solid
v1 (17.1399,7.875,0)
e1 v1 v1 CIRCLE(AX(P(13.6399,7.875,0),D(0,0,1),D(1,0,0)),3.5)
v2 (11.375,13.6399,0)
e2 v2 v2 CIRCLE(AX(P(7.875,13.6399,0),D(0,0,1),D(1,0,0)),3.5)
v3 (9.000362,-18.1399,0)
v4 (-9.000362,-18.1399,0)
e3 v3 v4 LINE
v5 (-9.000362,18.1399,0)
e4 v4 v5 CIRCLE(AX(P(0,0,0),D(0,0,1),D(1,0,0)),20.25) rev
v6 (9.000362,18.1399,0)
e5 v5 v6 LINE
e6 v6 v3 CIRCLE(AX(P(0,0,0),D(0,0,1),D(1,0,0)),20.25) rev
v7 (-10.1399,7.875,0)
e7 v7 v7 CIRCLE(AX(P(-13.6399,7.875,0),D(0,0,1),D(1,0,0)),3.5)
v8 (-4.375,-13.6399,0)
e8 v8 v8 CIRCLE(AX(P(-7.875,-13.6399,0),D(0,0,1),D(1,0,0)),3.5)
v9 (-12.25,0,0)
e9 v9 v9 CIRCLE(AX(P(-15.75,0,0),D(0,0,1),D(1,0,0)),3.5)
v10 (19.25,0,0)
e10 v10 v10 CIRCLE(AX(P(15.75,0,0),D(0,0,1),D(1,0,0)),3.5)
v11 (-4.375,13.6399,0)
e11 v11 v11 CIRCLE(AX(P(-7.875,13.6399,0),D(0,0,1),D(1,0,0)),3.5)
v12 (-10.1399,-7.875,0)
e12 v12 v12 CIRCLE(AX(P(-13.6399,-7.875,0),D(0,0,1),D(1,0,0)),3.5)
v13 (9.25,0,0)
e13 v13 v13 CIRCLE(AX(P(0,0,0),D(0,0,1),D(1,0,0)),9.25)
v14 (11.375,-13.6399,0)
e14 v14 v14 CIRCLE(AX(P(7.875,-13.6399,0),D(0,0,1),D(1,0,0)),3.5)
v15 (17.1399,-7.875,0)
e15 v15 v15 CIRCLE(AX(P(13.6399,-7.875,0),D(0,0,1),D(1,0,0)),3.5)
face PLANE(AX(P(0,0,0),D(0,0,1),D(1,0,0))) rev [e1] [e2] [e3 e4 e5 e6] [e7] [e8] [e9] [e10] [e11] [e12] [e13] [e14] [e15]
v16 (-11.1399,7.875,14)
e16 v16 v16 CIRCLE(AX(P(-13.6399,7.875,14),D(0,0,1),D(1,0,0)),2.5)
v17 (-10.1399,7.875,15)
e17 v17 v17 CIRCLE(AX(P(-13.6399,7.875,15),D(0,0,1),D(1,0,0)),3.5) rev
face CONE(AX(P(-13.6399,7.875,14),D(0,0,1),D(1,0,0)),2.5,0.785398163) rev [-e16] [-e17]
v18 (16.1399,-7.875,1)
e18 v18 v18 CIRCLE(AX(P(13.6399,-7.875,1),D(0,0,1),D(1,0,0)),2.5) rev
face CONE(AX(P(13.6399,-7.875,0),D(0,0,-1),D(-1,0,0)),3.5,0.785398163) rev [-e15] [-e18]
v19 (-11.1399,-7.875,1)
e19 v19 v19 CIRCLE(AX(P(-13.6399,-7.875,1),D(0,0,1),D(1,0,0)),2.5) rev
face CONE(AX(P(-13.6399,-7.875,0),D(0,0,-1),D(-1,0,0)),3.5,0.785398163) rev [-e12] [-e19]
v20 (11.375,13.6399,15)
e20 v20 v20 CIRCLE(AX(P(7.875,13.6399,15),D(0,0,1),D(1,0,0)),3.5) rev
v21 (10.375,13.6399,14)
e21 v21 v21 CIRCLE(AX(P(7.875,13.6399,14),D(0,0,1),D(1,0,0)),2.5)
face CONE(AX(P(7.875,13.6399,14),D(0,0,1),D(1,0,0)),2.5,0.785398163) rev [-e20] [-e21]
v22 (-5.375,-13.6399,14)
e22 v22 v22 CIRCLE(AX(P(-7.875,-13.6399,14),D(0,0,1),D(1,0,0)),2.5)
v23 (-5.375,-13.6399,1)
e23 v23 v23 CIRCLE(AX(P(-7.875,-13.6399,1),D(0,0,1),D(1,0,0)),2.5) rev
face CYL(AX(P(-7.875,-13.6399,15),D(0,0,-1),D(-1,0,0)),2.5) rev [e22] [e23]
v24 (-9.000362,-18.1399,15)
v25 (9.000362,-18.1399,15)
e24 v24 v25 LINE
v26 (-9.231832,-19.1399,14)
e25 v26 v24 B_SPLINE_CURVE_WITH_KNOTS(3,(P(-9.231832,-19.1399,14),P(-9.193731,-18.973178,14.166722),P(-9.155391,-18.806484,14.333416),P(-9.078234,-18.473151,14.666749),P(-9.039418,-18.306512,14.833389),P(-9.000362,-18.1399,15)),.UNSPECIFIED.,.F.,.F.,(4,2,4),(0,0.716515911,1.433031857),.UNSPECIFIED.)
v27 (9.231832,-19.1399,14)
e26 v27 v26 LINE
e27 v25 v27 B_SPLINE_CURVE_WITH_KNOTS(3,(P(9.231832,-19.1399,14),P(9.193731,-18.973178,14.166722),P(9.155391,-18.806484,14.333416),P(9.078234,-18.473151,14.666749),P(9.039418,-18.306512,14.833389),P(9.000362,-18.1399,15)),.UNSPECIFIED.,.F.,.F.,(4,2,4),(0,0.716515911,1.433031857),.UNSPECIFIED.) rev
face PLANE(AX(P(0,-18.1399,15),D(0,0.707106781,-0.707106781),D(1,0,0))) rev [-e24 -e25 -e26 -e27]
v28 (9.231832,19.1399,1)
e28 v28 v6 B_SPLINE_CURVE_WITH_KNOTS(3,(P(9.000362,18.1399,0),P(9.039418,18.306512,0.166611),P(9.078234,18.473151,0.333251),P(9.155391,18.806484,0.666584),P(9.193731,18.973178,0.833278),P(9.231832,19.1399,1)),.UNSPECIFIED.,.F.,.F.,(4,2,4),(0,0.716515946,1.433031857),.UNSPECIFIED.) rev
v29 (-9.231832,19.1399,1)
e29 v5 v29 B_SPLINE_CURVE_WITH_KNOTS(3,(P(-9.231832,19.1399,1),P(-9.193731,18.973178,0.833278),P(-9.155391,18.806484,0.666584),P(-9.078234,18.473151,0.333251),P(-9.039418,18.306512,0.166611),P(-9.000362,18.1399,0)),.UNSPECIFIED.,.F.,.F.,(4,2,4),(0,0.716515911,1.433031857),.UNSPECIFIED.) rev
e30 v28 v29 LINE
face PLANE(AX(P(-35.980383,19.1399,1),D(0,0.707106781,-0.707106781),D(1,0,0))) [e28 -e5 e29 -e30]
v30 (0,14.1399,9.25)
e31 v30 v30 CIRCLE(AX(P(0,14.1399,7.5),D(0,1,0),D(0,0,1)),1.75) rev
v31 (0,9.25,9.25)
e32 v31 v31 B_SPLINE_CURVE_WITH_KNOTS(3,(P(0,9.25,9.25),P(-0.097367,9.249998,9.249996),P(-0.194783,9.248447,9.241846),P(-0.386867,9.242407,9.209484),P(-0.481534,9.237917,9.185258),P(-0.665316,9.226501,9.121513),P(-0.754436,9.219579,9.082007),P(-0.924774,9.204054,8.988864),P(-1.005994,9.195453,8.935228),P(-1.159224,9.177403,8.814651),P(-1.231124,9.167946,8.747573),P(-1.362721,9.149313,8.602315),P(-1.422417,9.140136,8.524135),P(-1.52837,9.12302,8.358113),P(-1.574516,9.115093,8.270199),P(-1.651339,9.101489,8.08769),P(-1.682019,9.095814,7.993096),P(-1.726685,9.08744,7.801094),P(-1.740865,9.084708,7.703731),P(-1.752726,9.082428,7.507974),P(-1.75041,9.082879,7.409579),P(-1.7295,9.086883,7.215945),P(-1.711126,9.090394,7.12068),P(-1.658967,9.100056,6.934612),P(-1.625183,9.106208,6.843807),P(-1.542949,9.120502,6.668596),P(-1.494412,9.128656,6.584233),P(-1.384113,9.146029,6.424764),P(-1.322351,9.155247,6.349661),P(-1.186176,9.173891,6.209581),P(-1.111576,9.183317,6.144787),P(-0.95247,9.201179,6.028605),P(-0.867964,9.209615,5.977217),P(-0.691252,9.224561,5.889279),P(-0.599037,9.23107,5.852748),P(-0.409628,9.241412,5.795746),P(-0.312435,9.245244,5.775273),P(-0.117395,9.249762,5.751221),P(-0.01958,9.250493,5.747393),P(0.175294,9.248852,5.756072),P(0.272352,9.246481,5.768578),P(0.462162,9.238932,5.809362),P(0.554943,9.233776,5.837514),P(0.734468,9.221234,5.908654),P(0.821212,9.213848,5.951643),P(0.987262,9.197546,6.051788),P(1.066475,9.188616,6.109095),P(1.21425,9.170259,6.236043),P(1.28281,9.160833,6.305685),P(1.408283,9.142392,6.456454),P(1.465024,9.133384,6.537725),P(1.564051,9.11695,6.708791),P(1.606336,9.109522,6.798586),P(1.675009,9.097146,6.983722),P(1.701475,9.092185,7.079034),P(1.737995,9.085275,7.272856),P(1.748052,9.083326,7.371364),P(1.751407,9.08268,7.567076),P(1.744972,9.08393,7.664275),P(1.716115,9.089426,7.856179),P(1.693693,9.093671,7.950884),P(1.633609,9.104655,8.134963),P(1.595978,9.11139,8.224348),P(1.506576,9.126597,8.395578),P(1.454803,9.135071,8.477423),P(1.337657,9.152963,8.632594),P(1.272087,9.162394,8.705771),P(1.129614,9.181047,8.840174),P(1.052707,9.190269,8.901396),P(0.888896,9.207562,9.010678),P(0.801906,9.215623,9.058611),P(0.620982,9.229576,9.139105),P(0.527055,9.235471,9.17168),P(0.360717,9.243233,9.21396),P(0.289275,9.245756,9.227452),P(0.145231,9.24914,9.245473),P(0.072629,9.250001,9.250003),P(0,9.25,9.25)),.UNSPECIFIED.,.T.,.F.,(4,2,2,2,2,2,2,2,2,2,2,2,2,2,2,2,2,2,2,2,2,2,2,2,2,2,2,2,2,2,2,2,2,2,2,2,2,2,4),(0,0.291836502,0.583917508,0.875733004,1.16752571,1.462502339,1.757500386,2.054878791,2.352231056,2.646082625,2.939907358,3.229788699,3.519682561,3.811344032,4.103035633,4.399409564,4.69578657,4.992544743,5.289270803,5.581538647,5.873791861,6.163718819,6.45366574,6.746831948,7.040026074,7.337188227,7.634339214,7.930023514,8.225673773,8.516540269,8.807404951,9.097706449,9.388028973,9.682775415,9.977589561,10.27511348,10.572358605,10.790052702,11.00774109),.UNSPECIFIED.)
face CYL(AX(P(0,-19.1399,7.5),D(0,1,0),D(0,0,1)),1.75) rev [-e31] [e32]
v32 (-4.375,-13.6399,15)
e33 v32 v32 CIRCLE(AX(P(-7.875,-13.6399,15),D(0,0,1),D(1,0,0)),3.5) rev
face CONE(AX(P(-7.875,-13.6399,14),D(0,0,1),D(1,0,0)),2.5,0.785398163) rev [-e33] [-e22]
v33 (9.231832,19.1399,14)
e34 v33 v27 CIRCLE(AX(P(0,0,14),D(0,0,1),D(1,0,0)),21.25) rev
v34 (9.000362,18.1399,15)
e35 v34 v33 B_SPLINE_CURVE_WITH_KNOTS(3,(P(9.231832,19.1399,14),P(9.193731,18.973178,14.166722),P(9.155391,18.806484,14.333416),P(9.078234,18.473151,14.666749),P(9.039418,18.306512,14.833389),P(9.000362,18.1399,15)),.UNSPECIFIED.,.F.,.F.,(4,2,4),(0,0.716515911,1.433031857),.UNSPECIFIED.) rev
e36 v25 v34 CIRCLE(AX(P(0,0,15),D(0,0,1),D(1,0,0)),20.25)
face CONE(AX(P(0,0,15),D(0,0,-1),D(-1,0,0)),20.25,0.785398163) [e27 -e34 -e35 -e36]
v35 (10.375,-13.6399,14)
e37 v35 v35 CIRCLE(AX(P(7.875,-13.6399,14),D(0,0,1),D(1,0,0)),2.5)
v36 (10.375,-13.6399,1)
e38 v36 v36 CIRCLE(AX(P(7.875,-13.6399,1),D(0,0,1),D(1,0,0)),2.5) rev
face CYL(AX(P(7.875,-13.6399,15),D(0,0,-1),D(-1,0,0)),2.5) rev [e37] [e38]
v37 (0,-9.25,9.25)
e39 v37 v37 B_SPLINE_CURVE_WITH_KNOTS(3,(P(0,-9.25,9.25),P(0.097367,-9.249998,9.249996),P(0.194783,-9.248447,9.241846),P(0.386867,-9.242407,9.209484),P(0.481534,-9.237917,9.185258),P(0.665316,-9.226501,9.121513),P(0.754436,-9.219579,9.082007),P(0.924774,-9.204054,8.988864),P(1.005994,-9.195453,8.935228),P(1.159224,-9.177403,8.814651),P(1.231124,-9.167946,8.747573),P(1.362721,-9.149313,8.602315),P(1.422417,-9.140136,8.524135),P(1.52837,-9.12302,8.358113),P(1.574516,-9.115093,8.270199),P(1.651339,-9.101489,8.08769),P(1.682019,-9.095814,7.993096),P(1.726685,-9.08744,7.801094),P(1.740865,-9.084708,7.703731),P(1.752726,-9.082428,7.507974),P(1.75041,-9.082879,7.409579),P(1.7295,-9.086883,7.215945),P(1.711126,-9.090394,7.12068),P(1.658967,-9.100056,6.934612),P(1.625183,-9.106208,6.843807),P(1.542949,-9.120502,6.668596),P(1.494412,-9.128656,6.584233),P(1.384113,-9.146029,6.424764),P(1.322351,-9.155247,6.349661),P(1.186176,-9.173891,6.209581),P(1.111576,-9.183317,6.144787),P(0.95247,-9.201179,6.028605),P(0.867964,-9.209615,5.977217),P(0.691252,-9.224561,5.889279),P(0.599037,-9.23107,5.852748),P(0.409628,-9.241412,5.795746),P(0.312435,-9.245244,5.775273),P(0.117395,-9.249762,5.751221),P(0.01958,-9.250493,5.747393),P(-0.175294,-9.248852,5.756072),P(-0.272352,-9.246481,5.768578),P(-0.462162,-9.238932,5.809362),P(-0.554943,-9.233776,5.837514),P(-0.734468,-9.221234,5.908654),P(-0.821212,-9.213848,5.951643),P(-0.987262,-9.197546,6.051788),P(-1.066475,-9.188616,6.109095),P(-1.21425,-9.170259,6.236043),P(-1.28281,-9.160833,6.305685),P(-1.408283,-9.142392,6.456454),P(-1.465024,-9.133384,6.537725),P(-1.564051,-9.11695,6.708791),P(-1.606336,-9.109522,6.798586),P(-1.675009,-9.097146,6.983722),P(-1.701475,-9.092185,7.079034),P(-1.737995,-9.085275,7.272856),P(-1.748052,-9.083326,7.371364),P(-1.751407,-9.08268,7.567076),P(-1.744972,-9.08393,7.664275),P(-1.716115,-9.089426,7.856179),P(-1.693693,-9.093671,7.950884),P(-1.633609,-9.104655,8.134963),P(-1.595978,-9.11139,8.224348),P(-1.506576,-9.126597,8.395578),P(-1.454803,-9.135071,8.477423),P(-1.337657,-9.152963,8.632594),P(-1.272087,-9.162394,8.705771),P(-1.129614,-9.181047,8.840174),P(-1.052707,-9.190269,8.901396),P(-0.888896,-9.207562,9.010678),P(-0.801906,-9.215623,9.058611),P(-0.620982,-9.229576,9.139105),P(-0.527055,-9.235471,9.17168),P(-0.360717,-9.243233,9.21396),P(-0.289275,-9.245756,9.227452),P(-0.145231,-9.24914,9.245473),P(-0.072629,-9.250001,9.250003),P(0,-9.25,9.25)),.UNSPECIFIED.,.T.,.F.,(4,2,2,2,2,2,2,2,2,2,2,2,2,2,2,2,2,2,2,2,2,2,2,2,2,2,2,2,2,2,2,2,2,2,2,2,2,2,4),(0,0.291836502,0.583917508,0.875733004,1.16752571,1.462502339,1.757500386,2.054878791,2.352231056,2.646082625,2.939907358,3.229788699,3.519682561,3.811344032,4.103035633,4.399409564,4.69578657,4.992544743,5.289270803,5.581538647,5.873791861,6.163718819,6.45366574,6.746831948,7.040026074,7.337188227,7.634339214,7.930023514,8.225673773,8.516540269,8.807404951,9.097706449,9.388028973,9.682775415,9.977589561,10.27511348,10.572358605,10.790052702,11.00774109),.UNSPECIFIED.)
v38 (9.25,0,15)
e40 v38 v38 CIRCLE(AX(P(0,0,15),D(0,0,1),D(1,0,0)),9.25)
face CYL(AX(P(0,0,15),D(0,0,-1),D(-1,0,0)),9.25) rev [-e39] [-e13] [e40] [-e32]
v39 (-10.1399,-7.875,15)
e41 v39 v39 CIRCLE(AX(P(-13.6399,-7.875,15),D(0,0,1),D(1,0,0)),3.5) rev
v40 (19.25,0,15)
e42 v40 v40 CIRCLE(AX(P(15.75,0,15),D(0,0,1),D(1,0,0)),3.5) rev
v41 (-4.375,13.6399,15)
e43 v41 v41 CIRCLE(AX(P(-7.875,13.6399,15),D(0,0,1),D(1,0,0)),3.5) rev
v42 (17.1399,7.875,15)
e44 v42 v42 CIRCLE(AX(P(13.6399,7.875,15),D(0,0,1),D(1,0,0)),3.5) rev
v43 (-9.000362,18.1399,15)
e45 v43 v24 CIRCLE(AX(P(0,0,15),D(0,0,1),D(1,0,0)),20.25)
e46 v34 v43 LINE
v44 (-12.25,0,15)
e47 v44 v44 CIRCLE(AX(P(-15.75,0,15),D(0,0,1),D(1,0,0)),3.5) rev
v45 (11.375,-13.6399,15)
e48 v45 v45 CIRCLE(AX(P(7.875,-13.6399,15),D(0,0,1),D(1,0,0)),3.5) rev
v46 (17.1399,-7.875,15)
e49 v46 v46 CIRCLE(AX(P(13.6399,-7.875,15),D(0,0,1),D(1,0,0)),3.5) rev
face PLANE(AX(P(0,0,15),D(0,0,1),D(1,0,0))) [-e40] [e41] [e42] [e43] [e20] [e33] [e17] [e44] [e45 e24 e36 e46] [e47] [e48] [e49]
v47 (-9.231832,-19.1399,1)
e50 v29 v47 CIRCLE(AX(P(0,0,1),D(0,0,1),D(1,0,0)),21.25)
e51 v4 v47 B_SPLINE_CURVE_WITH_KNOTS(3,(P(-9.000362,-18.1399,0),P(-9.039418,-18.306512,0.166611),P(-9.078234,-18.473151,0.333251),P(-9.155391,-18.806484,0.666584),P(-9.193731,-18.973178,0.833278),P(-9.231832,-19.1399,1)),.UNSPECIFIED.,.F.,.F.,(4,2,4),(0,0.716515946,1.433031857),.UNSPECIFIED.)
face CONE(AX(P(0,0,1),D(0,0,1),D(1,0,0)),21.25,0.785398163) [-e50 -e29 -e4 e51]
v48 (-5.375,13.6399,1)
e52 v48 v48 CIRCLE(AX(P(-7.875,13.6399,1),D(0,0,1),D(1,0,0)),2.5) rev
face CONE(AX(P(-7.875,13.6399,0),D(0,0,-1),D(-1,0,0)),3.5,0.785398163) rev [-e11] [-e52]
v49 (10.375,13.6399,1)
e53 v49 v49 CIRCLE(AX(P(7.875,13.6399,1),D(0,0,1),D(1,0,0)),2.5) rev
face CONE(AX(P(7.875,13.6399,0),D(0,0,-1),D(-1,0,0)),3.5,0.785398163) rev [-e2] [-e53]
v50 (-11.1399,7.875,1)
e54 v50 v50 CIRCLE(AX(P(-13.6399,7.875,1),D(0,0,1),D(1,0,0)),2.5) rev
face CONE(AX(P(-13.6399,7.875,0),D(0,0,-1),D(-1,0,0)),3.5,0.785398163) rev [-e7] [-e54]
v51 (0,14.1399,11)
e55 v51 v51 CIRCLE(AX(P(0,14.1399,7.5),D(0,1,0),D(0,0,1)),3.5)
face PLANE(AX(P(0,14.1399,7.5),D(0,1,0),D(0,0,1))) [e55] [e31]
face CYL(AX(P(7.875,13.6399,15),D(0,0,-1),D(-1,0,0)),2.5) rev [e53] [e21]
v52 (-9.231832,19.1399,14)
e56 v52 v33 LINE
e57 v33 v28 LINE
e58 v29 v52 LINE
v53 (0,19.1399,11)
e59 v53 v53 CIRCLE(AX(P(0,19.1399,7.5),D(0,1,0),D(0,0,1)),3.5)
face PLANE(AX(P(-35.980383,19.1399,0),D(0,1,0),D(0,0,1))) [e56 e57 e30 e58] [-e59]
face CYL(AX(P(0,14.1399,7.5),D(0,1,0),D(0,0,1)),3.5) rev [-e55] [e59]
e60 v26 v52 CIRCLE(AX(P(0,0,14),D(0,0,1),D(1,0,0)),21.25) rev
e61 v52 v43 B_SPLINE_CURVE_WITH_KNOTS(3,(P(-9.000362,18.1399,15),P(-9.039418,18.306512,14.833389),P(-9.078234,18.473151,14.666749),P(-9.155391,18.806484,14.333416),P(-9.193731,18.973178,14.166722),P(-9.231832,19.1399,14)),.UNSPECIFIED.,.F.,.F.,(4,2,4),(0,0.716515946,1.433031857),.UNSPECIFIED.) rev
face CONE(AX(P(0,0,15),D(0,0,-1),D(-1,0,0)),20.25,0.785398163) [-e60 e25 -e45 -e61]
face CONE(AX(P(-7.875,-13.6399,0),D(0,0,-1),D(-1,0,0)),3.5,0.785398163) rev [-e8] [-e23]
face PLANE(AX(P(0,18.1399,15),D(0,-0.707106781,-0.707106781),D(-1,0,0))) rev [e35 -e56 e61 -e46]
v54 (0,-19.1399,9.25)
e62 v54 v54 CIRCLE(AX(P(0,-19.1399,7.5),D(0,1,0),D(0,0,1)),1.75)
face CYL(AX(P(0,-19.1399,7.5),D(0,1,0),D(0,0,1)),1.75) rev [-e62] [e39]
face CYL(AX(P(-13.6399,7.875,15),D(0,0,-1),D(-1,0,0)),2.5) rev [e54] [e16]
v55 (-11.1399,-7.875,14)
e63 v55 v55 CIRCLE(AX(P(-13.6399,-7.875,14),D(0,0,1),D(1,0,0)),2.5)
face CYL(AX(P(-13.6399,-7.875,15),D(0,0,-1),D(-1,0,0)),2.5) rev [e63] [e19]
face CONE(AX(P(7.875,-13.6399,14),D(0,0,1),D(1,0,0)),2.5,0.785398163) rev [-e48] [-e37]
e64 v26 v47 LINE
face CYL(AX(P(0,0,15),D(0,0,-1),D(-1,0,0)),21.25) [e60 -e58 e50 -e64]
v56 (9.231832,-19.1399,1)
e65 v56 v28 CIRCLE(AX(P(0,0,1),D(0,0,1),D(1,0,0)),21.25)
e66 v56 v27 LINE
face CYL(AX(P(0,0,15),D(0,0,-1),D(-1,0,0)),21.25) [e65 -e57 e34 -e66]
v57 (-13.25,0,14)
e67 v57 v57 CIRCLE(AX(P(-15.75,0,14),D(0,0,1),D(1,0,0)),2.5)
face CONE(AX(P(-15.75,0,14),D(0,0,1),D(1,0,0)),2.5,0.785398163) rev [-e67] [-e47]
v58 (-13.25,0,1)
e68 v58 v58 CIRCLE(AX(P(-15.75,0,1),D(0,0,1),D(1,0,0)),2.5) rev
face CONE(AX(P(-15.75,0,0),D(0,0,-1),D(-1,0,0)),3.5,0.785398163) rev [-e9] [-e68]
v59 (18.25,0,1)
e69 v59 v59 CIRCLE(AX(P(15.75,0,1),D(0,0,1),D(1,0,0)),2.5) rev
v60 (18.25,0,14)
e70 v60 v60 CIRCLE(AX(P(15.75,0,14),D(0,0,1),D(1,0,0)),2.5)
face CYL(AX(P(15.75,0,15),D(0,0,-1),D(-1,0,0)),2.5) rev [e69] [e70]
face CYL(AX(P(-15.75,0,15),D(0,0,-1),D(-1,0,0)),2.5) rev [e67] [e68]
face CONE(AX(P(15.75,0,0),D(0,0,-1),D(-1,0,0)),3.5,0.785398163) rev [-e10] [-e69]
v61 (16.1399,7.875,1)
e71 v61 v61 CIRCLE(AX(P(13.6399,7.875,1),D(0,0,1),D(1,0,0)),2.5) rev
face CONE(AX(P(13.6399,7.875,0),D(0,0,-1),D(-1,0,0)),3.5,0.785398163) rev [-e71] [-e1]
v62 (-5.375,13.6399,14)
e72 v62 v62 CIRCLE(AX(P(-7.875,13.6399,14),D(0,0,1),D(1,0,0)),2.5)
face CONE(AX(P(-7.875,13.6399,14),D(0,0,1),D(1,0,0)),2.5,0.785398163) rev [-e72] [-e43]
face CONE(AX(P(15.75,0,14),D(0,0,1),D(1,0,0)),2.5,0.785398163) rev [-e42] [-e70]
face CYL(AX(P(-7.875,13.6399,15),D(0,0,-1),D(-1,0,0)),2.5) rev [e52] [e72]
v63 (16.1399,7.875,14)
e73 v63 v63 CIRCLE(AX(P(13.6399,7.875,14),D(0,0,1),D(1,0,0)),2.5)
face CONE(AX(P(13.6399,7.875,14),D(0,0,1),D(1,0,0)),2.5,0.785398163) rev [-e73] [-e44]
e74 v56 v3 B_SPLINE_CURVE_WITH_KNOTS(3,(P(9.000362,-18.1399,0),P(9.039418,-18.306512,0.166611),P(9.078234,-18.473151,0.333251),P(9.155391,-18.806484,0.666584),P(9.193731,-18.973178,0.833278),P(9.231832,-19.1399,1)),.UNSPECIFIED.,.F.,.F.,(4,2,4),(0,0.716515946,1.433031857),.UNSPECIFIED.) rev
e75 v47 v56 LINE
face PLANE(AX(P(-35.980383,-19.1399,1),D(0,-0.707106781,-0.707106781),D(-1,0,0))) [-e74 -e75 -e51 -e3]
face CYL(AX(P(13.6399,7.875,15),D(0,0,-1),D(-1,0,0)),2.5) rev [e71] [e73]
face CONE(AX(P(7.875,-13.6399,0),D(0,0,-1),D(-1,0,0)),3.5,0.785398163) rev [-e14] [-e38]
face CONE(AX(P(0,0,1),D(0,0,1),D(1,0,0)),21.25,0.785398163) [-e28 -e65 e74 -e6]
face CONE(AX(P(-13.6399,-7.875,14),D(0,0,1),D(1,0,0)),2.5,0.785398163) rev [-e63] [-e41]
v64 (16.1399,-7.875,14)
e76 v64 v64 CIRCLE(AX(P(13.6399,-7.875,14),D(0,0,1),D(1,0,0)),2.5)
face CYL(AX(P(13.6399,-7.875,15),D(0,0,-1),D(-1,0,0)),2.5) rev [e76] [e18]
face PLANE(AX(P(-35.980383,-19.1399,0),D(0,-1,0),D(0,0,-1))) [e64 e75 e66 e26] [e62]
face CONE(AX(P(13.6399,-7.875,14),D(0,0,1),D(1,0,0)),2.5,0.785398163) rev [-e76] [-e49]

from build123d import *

# Parameters (mm, degrees)
SKETCH_1_R          = 21.25
SKETCH_1_R_2        = 9.25
SKETCH_1_R_3        = 2.5
EXTRUDE_1_DEPTH     = 15
CUT_EXTRUDE_START   = -15
CUT_EXTRUDE_1_DEPTH = 15
SKETCH_3_R          = 1.75
CUT_EXTRUDE_2_DEPTH = 47.280726062
CHAMFER_1_SIZE      = 1
CHAMFER_2_SIZE      = 1
SKETCH_4_R          = 3.5
CUT_EXTRUDE_3_DEPTH = 5


# Read off the part's stored shape, not the designer's step: ｶｯﾄ - 押し出し1
with BuildPart() as part:
    # ｽｹｯﾁ1 → ﾎﾞｽ - 押し出し1 (new body)
    with BuildSketch(Plane.XY):
        Circle(SKETCH_1_R)
        Circle(SKETCH_1_R_2, mode=Mode.SUBTRACT)
        with Locations((15.75, 0)):
            Circle(SKETCH_1_R_3, mode=Mode.SUBTRACT)
        with Locations((13.63990011, -7.875)):
            Circle(SKETCH_1_R_3, mode=Mode.SUBTRACT)
        with Locations((7.875, -13.63990011)):
            Circle(SKETCH_1_R_3, mode=Mode.SUBTRACT)
        with Locations(Location((7.875, 13.63990011, 0), (0, 0, 180))):
            Circle(SKETCH_1_R_3, mode=Mode.SUBTRACT)
        with Locations(Location((13.63990011, 7.875, 0), (0, 0, 180))):
            Circle(SKETCH_1_R_3, mode=Mode.SUBTRACT)
        with Locations(Location((-7.875, -13.63990011, 0), (0, 0, 180))):
            Circle(SKETCH_1_R_3, mode=Mode.SUBTRACT)
        with Locations(Location((-13.63990011, -7.875, 0), (0, 0, 180))):
            Circle(SKETCH_1_R_3, mode=Mode.SUBTRACT)
        with Locations(Location((-15.75, 0, 0), (0, 0, 180))):
            Circle(SKETCH_1_R_3, mode=Mode.SUBTRACT)
        with Locations((-13.63990011, 7.875)):
            Circle(SKETCH_1_R_3, mode=Mode.SUBTRACT)
        with Locations((-7.875, 13.63990011)):
            Circle(SKETCH_1_R_3, mode=Mode.SUBTRACT)
    extrude(amount=EXTRUDE_1_DEPTH)

    # ｶｯﾄ - 押し出し1 outline → ｶｯﾄ - 押し出し1 (cut)
    with BuildSketch(Plane.XY.offset(15).offset(CUT_EXTRUDE_START)):
        with BuildLine():
            Line((-9.231832093, 19.13990011), (9.231832093, 19.13990011))
            ThreePointArc((9.231832093, 19.13990011), (0, 21.25), (-9.231832093, 19.13990011))
        make_face()
        with BuildLine():
            Line((9.231832093, -19.13990011), (-9.231832093, -19.13990011))
            ThreePointArc((-9.231832093, -19.13990011), (0, -21.25), (9.231832093, -19.13990011))
        make_face()
    extrude(amount=CUT_EXTRUDE_1_DEPTH, mode=Mode.SUBTRACT)

    # ｽｹｯﾁ3 → ｶｯﾄ - 押し出し2 (cut, through all)
    with BuildSketch(Plane(origin=(0, 19.13990011, 0), x_dir=(1, 0, 0), z_dir=(0, 1, 0))):
        with Locations(Location((0, -7.5, 0), (0, 0, 270))):
            Circle(SKETCH_3_R)
    extrude(amount=-CUT_EXTRUDE_2_DEPTH, mode=Mode.SUBTRACT)

    # 面取り1
    chamfer_1_edges = [part.edges().sort_by_distance(p)[0] for p in [
        (10.375, 13.63990011, 0),
        (10.375, 13.63990011, 15),
        (11.13990011, -7.875, 0),
        (11.13990011, -7.875, 15),
        (5.375, -13.63990011, 0),
        (5.375, -13.63990011, 15),
        (16.13990011, 7.875, 0),
        (16.13990011, 7.875, 15),
        (-5.375, -13.63990011, 0),
        (-5.375, -13.63990011, 15),
        (-11.13990011, -7.875, 0),
        (-11.13990011, -7.875, 15),
        (-13.25, 0, 0),
        (-13.25, 0, 15),
        (-16.13990011, 7.875, 0),
        (-16.13990011, 7.875, 15),
        (-10.375, 13.63990011, 0),
        (-10.375, 13.63990011, 15),
        (13.25, 0, 0),
        (13.25, 0, 15),
    ]]
    chamfer(chamfer_1_edges, length=CHAMFER_1_SIZE)

    # 面取り2
    chamfer_2_edges = [part.edges().sort_by_distance(p)[0] for p in [
        (-21.25, 0, 15),
        (21.25, 0, 15),
        (-21.25, 0, 0),
        (21.25, 0, 0),
        (0, 19.13990011, 0),
        (0, -19.13990011, 0),
        (0, -19.13990011, 15),
        (0, 19.13990011, 15),
    ]]
    chamfer(chamfer_2_edges, length=CHAMFER_2_SIZE)

    # ｽｹｯﾁ4 → ｶｯﾄ - 押し出し3 (cut)
    with BuildSketch(Plane(origin=(0, 19.13990011, 0), x_dir=(1, 0, 0), z_dir=(0, 1, 0))):
        with Locations(Location((0, -7.5, 0), (0, 0, 270))):
            Circle(SKETCH_4_R)
    extrude(amount=-CUT_EXTRUDE_3_DEPTH, mode=Mode.SUBTRACT)


solid = part.part
